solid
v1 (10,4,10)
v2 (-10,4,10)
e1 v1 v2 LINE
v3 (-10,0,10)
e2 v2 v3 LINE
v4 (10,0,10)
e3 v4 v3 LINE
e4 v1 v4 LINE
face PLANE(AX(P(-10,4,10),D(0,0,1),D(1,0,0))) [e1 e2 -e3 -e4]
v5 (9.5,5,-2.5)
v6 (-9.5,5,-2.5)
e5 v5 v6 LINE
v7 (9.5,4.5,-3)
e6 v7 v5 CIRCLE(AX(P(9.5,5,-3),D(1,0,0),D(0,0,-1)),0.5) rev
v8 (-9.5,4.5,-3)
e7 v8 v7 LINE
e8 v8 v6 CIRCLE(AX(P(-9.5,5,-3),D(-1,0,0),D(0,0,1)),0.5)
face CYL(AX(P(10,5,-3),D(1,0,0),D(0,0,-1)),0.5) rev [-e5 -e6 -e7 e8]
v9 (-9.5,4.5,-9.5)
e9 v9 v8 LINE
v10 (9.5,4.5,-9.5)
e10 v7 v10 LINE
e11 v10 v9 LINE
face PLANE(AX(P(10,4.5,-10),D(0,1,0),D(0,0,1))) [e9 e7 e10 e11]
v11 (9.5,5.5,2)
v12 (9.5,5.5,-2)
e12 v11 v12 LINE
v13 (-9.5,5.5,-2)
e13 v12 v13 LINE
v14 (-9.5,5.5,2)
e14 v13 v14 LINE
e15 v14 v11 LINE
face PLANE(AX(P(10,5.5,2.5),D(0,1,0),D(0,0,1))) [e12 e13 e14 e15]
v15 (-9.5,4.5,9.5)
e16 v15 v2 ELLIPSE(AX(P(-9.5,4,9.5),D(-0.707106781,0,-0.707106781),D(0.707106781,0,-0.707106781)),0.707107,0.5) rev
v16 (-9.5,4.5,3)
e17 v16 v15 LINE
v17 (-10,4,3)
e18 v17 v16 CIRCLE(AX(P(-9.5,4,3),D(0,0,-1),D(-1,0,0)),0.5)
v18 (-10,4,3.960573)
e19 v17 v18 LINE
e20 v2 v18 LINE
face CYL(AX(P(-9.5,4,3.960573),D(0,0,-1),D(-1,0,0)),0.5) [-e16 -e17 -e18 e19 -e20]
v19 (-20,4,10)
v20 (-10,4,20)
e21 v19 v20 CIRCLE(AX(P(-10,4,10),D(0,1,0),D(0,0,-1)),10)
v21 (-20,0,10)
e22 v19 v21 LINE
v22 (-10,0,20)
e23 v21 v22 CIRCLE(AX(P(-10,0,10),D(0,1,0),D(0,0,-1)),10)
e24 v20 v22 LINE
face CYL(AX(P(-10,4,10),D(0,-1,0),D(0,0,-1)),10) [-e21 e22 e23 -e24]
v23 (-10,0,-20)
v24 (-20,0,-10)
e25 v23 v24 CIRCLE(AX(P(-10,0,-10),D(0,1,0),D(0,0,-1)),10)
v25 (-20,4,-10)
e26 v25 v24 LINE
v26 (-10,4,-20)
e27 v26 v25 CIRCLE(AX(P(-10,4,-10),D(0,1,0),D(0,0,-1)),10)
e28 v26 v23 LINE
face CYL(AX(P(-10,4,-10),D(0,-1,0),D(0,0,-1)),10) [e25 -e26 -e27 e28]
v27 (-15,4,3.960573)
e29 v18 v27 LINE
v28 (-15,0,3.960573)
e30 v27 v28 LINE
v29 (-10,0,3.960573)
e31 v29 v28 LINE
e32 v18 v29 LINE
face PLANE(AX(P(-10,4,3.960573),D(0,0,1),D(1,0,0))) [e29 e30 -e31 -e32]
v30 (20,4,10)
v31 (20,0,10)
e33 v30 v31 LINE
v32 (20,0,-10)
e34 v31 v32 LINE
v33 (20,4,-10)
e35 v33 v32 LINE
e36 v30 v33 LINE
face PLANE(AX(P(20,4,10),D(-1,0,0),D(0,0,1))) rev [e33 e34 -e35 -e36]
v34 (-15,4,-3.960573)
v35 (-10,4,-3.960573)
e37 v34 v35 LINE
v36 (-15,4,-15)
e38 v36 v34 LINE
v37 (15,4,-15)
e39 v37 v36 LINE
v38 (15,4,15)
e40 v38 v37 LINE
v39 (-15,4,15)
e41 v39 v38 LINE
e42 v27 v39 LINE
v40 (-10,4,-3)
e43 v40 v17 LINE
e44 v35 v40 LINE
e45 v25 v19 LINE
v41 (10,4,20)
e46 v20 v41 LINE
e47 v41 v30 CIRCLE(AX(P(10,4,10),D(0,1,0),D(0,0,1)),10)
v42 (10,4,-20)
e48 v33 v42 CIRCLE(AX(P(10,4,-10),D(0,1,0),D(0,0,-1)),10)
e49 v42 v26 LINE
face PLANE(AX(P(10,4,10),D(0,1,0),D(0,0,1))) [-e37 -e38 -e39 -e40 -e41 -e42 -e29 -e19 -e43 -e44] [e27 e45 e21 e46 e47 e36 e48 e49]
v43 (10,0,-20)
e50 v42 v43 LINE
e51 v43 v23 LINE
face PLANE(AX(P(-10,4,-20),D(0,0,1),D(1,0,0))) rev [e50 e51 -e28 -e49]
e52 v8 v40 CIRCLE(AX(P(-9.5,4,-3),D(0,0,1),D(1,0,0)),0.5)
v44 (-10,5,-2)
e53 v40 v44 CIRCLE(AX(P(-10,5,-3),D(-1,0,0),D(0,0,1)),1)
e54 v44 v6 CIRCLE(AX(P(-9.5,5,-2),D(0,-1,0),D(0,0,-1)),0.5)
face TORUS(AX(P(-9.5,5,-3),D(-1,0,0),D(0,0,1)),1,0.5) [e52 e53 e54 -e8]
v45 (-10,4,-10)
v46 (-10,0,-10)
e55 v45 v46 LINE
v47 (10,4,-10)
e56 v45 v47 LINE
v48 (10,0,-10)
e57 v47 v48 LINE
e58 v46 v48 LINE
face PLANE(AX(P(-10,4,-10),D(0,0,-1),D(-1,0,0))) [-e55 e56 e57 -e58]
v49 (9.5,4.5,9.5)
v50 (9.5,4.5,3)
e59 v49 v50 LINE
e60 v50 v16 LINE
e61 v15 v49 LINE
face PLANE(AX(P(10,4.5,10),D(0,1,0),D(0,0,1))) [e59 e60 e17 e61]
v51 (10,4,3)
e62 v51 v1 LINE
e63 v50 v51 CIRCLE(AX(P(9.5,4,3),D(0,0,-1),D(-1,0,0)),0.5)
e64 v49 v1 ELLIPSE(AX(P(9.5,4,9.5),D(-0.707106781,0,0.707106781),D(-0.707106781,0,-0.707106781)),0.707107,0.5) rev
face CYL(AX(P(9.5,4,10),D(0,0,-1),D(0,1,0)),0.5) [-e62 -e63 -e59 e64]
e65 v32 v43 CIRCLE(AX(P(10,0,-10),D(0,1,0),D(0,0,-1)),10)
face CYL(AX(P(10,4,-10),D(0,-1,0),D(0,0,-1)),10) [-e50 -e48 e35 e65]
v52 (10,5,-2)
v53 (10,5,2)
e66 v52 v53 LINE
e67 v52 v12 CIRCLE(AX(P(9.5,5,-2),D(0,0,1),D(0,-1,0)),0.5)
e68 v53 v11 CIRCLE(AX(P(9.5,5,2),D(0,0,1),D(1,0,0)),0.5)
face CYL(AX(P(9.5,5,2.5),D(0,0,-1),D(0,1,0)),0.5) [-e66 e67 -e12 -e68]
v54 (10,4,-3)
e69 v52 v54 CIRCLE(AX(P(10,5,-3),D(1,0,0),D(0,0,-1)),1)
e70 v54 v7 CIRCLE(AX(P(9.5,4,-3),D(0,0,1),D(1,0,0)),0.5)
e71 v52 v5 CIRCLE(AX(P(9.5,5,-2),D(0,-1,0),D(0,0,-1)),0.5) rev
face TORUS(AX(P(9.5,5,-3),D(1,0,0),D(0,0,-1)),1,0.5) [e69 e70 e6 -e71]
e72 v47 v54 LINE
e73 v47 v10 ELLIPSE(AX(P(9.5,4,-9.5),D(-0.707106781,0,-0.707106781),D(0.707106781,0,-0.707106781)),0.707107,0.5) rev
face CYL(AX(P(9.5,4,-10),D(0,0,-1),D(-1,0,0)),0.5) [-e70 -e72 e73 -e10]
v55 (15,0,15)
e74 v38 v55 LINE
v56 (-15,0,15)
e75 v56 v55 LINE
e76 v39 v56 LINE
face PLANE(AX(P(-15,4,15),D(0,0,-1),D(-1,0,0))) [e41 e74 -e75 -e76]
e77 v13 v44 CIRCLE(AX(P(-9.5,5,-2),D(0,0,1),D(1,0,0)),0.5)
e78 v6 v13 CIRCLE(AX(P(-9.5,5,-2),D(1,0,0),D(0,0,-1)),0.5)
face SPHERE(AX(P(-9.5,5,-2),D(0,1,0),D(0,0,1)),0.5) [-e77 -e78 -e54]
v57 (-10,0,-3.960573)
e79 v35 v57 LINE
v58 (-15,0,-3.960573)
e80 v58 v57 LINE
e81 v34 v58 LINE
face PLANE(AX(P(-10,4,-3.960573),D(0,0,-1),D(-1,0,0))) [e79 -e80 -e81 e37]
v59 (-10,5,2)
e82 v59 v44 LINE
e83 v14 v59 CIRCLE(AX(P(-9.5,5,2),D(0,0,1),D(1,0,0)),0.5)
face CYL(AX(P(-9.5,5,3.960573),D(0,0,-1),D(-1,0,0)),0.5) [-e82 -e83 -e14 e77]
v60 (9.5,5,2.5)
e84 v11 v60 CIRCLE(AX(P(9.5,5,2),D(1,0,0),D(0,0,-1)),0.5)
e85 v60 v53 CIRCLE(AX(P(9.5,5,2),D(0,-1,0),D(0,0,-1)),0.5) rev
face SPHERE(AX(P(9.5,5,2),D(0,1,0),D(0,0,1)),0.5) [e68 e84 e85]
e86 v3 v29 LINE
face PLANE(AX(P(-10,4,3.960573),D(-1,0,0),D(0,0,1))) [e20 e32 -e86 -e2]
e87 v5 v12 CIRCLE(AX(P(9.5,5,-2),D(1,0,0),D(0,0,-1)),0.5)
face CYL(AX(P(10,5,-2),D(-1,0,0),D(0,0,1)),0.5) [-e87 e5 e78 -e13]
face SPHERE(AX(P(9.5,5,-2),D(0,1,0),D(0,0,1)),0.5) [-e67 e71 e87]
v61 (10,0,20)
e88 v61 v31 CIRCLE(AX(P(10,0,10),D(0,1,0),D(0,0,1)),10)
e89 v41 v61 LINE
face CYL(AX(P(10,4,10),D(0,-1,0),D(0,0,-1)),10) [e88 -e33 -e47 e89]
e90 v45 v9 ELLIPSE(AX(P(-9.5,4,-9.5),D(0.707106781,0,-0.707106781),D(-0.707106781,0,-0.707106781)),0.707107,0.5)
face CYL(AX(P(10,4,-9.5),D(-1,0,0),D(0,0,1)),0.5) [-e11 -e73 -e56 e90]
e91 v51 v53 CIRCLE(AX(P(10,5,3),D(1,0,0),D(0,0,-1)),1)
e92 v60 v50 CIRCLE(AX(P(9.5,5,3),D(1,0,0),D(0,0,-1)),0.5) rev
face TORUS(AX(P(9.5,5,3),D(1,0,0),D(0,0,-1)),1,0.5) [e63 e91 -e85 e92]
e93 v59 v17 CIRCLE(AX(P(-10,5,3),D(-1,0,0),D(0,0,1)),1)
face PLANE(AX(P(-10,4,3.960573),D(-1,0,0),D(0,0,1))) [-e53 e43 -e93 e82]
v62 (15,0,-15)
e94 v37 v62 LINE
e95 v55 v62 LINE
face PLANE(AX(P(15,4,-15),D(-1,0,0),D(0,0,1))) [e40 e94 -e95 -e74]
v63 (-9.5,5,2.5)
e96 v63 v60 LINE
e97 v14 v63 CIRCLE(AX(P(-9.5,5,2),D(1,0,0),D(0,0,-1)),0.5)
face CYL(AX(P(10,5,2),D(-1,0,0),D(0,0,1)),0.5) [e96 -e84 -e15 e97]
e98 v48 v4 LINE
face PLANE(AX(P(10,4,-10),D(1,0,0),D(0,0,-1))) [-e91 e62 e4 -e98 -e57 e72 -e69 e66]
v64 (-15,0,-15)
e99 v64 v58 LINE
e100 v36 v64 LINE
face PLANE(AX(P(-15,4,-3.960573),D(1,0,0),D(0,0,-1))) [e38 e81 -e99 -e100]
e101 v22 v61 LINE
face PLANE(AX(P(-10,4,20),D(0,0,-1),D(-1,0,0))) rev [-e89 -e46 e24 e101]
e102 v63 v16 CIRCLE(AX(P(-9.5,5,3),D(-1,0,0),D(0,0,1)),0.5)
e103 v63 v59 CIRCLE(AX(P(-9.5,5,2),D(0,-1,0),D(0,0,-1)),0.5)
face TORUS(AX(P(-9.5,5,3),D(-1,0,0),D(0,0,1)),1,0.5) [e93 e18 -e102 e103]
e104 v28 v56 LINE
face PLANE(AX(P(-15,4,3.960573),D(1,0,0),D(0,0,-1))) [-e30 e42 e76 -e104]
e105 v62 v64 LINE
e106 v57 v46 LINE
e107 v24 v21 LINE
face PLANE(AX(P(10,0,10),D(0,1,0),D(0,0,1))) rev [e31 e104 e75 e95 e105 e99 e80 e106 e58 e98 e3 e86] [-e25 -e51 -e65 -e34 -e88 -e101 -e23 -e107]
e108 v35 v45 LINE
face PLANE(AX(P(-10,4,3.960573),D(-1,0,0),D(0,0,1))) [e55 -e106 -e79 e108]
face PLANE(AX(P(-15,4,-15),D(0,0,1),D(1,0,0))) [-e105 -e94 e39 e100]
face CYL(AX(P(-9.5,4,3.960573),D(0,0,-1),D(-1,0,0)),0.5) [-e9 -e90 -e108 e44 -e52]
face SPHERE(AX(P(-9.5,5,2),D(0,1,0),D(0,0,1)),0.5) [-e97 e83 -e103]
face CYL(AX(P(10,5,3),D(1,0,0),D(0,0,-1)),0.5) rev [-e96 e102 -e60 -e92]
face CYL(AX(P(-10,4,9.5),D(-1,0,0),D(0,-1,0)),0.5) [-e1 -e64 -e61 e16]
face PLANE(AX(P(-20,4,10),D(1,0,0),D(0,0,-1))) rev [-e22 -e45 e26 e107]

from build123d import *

# Parameters (mm, degrees)
EXTRUDE_1_DEPTH = 4
EXTRUDE_2_DEPTH = 20
FILLET_1_R      = 0.5
FILLET_2_R      = 0.5


with BuildPart() as part:
    # 草图1 → 凸台-拉伸1 (new body)
    with BuildSketch(Plane(origin=(0, 0, 0), x_dir=(1, 0, 0), z_dir=(0, 1, 0))):
        with BuildLine():
            Line((-10, -20), (10, -20))
            ThreePointArc((10, -20), (17.071067812, -17.071067812), (20, -10))
            Line((20, -10), (20, 10))
            ThreePointArc((20, 10), (17.071067812, 17.071067812), (10, 20))
            Line((10, 20), (-10, 20))
            ThreePointArc((-10, 20), (-17.071067812, 17.071067812), (-20, 10))
            Line((-20, 10), (-20, -10))
            ThreePointArc((-20, -10), (-17.071067812, -17.071067812), (-10, -20))
        make_face()
        Polygon((-10, 3.960573477), (-15, 3.960573477), (-15, 15), (15, 15), (15, -15), (-15, -15), (-15, -3.960573477), (-10, -3.960573477), (-10, -10), (10, -10), (10, 10), (-10, 10), align=None, mode=Mode.SUBTRACT)
    extrude(amount=EXTRUDE_1_DEPTH)

    # 草图2 → 凸台-拉伸2 (add)
    with BuildSketch(Plane.ZY.offset(10)):
        Polygon((-10, 4), (10, 4), (10, 4.5), (2.5, 4.5), (2.5, 5.5), (-2.5, 5.5), (-2.5, 4.5), (-10, 4.5), align=None)
    extrude(amount=-EXTRUDE_2_DEPTH)

    # 圆角1
    fillet_1_edges = [part.edges().sort_by_distance(p)[0] for p in [
        (10, 4.5, -6.25),
        (0, 4.5, -10),
        (10, 5, -2.5),
        (0, 4.5, -2.5),
        (10, 5, 2.5),
        (10, 4.5, 6.25),
        (0, 4.5, 2.5),
        (0, 4.5, 10),
        (-10, 4.5, 6.25),
        (-10, 5, 2.5),
        (-10, 5, -2.5),
        (-10, 4.5, -6.25),
    ]]
    fillet(fillet_1_edges, radius=FILLET_1_R - 0.0001)  # a hair under: the kernel refuses the full size

    # 圆角2
    fillet_2_edges = [part.edges().sort_by_distance(p)[0] for p in [
        (9.85358268, 5.5, 2.35358268),
        (0, 5.5, 2.5),
        (-9.85358268, 5.5, 2.35358268),
        (-10, 5.5, 0),
        (-9.85358268, 5.5, -2.35358268),
        (0, 5.5, -2.5),
        (9.85358268, 5.5, -2.35358268),
        (10, 5.5, 0),
    ]]
    fillet(fillet_2_edges, radius=FILLET_2_R - 0.0001)  # a hair under: the kernel refuses the full size


solid = part.part
